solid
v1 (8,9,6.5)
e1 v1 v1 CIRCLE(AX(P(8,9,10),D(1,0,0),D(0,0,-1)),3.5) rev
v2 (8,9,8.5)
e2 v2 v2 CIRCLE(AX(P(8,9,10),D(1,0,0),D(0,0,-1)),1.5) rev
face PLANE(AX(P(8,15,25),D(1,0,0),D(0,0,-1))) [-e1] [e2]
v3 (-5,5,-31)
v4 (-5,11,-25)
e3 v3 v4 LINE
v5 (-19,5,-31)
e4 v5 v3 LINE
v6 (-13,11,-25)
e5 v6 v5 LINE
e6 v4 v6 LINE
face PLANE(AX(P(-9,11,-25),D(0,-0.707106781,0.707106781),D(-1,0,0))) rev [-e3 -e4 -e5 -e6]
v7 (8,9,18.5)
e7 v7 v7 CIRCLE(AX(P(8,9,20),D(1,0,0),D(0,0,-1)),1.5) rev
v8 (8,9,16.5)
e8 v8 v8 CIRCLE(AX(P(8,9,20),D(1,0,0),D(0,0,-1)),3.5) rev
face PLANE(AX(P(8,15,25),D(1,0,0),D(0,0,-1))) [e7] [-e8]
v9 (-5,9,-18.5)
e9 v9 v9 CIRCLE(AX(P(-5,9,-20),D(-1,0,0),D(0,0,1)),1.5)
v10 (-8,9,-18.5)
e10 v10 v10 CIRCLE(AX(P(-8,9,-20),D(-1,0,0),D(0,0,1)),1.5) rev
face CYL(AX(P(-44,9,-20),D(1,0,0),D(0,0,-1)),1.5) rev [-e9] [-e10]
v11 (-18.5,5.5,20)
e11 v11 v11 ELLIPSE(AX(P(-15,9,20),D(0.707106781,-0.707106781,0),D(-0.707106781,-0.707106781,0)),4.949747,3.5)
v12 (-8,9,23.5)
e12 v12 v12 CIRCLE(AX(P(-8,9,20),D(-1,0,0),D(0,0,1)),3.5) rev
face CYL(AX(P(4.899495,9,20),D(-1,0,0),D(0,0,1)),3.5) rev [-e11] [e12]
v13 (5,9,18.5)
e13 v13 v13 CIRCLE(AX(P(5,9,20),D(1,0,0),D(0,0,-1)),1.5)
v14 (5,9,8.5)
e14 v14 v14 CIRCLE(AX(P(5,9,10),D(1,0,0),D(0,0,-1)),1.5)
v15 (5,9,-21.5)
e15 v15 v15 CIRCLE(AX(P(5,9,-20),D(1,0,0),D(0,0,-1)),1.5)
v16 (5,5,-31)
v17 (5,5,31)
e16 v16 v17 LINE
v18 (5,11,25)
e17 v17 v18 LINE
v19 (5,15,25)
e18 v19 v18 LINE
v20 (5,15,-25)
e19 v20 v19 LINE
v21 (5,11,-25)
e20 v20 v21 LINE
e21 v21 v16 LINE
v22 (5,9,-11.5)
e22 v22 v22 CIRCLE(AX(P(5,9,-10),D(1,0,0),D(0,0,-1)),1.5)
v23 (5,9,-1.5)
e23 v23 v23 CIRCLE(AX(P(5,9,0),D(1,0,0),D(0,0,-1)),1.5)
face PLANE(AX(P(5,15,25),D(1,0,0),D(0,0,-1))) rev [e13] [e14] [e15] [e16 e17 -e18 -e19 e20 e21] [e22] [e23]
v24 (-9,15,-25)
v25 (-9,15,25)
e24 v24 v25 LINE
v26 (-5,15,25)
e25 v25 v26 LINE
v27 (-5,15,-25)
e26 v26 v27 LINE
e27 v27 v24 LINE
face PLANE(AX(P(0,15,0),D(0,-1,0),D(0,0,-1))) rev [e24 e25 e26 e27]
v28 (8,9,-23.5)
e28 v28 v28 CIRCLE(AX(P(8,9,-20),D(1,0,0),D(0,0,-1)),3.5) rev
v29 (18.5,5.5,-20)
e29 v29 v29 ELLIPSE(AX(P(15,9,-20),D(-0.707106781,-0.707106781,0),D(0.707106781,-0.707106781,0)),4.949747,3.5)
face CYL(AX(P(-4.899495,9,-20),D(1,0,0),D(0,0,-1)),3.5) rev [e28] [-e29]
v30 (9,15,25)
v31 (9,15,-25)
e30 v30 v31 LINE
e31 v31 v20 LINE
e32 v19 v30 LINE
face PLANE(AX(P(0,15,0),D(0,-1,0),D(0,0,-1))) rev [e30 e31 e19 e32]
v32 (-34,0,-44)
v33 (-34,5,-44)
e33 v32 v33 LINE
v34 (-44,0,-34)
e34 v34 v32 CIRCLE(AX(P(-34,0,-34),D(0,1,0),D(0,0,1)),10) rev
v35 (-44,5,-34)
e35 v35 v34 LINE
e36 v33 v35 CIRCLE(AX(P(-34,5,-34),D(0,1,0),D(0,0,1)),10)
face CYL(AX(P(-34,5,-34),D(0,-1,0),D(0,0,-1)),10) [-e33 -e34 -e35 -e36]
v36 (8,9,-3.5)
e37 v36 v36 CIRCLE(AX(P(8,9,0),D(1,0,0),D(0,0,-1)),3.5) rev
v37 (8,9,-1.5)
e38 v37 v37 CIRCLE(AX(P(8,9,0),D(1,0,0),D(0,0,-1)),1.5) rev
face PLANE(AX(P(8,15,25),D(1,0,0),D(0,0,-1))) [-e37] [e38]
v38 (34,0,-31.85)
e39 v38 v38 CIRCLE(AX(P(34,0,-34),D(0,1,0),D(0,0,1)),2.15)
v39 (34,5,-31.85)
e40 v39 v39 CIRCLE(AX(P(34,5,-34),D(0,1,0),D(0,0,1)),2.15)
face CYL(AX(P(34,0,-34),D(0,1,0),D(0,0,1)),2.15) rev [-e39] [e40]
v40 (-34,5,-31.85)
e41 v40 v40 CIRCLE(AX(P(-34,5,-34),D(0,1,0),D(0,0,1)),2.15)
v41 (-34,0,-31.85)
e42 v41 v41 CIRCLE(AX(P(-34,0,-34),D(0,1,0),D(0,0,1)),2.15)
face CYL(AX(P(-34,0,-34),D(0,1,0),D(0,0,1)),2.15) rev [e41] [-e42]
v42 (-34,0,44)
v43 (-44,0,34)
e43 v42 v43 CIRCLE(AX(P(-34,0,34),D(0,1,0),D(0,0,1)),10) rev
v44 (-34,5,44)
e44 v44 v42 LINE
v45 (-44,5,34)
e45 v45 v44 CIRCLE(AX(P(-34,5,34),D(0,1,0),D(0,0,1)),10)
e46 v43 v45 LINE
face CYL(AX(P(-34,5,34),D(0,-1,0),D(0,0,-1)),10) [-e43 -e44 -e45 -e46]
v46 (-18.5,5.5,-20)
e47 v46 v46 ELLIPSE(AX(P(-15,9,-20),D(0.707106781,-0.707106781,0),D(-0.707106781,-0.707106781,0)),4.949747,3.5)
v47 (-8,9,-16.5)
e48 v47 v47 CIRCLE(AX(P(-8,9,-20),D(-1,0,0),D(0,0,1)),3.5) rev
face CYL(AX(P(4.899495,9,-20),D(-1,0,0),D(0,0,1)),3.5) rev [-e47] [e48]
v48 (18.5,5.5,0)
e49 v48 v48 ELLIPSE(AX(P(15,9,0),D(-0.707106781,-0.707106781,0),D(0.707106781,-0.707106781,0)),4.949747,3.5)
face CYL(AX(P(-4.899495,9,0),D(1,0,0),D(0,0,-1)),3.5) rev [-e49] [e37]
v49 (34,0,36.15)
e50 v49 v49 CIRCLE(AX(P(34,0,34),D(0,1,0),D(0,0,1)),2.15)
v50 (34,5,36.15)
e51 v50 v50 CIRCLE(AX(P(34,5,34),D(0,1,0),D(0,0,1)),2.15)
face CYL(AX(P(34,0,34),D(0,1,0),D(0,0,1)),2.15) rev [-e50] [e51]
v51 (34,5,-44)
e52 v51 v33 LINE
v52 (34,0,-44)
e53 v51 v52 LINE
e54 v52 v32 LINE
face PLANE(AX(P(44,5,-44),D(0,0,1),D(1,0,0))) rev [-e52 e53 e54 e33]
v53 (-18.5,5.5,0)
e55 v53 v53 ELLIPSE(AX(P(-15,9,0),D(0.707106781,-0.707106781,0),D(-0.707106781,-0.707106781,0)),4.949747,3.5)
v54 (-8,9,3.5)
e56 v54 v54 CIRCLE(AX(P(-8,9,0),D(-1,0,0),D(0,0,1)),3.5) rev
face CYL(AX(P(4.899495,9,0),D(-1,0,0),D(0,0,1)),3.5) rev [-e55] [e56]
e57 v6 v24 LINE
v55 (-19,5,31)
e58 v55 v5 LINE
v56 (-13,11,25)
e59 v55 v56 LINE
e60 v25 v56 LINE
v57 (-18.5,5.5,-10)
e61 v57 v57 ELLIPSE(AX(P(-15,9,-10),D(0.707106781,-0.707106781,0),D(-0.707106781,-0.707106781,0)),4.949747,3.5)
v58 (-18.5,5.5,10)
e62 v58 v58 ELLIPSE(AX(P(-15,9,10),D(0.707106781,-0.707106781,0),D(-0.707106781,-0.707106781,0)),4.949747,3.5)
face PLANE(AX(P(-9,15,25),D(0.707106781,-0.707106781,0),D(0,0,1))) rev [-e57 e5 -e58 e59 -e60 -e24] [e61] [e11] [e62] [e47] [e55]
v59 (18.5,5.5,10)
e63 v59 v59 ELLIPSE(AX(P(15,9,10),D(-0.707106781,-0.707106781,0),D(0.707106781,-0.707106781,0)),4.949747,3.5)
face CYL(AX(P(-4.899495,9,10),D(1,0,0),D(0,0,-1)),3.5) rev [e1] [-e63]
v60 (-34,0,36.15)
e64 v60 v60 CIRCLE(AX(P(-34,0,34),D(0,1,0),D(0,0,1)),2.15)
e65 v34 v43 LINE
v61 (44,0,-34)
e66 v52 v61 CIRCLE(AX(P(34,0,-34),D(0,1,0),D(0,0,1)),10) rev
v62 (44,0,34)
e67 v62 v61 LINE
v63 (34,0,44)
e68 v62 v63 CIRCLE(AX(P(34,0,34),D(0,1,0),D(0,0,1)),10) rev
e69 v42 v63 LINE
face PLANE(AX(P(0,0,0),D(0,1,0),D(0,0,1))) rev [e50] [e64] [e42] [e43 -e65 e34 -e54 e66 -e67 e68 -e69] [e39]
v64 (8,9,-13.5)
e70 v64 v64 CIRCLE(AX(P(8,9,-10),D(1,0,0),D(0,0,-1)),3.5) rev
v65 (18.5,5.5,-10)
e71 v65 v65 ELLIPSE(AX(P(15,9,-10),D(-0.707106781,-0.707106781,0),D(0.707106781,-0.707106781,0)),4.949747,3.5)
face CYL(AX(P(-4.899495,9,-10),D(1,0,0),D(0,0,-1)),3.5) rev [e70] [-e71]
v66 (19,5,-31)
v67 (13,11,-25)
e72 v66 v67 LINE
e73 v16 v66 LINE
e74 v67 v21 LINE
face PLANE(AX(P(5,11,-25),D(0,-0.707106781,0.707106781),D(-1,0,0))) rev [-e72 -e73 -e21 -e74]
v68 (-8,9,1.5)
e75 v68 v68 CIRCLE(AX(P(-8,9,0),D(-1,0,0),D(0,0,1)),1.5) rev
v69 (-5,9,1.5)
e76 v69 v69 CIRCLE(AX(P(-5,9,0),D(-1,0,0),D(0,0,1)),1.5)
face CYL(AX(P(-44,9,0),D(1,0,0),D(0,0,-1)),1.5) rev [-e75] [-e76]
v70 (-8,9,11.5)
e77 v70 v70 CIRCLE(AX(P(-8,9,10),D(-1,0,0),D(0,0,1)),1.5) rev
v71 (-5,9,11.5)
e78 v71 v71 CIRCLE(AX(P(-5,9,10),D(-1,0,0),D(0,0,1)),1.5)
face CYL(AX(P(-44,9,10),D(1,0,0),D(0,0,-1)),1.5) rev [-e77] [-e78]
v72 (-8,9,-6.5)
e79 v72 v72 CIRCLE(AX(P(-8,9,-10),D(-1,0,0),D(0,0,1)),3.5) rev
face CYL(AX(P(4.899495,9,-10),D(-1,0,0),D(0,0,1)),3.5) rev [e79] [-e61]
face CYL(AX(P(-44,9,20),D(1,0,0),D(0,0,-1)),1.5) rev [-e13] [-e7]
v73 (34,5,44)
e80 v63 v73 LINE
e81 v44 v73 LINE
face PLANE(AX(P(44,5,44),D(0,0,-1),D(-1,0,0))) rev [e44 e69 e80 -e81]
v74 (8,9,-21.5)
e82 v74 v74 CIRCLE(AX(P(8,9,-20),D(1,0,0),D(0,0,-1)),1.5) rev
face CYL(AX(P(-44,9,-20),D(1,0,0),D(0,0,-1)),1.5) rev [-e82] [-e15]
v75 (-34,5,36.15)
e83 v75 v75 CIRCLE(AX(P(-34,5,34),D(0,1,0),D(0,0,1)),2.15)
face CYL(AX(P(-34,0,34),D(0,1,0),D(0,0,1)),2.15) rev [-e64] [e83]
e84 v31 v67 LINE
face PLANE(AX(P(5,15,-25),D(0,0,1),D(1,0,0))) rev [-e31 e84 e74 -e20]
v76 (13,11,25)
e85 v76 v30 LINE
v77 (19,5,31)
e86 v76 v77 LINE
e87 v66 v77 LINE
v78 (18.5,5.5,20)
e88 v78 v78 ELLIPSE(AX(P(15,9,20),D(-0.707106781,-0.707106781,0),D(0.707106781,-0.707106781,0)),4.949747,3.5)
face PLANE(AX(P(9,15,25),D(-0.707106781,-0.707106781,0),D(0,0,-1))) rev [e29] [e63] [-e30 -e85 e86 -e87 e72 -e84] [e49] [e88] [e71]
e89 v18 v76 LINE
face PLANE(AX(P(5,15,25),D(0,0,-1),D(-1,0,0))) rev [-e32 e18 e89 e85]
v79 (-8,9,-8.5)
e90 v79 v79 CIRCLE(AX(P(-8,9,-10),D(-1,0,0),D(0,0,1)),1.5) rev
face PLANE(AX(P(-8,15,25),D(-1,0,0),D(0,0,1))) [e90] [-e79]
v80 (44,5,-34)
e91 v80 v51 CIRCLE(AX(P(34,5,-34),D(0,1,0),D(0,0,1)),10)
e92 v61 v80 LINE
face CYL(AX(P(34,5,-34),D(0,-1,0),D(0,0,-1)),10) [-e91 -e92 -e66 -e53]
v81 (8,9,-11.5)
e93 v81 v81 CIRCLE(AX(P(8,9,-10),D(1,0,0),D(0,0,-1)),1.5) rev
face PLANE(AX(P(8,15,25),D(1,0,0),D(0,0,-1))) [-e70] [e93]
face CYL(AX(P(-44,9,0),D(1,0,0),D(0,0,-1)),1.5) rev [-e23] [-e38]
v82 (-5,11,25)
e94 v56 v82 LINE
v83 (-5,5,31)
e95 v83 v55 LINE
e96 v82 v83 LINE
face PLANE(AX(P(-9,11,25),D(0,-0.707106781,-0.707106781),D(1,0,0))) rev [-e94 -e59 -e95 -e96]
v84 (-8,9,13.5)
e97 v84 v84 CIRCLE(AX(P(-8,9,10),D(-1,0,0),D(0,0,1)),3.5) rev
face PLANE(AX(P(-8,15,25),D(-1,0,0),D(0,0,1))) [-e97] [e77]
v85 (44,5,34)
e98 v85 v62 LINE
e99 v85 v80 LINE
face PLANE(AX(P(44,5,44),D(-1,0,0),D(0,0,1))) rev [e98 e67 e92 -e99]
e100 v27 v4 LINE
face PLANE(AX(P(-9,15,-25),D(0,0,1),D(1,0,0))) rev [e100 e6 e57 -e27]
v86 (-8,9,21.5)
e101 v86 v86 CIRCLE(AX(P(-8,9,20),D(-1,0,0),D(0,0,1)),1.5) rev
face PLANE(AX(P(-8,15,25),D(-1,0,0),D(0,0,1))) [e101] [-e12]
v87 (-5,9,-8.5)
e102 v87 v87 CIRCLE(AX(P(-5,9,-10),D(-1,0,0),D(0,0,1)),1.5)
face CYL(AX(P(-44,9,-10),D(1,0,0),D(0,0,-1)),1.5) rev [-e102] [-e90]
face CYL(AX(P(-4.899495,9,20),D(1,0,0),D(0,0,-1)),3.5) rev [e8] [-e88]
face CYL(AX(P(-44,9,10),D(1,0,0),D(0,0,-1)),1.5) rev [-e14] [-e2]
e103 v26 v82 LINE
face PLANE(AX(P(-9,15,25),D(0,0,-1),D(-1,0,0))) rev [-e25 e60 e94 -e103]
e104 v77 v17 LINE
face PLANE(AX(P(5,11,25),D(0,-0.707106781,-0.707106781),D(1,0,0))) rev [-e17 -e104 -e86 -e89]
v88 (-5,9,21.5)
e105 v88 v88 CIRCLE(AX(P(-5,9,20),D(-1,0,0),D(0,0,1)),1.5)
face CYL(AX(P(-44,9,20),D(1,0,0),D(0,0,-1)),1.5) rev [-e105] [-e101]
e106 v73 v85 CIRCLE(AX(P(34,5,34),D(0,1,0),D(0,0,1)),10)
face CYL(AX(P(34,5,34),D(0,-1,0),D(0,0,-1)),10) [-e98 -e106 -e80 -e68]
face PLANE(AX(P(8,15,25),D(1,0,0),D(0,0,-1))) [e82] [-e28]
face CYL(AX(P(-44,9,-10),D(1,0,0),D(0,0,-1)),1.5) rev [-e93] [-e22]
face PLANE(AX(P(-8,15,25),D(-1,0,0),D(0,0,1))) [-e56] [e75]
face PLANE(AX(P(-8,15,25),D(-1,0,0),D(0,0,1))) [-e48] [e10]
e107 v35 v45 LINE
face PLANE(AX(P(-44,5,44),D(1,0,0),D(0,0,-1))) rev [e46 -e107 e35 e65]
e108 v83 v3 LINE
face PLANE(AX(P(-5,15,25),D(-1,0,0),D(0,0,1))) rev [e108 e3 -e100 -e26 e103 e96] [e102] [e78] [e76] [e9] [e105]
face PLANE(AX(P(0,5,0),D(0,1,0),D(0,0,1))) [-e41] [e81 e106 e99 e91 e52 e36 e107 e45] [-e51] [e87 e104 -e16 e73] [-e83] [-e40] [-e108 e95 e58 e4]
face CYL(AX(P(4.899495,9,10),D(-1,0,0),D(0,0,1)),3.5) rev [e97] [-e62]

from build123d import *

# Parameters (mm, degrees)
SKETCH1_W           = 88
SKETCH1_H           = 88
BOSS_EXTRUDE1_DEPTH = 5
FILLET1_R           = 10
SKETCH2_R           = 2.15
CUT_EXTRUDE1_DEPTH  = 63.42595614
SKETCH3_W           = 4
SKETCH3_H           = 50
BOSS_EXTRUDE2_DEPTH = 10
CHAMFER1_SIZE       = 10
SKETCH4_R           = 1.5
CUT_EXTRUDE2_DEPTH  = 65.007812023
SKETCH5_R           = 3.5
CUT_EXTRUDE3_DEPTH  = 36
CUT_EXTRUDE4_START  = -36
SKETCH6_R           = 3.5
CUT_EXTRUDE4_DEPTH  = 36
LPATTERN2_COUNT     = 5
LPATTERN2_PITCH     = 10
CHAMFER2_SIZE       = 6


with BuildPart() as part:
    # Sketch1 → Boss-Extrude1 (new body)
    with BuildSketch(Plane(origin=(0, 0, 0), x_dir=(1, 0, 0), z_dir=(0, 1, 0))):
        Rectangle(SKETCH1_W, SKETCH1_H)
    extrude(amount=BOSS_EXTRUDE1_DEPTH)

    # Fillet1
    fillet1_edges = [part.edges().sort_by_distance(p)[0] for p in [
        (-44, 2.5, -44),
        (44, 2.5, -44),
        (44, 2.5, 44),
        (-44, 2.5, 44),
    ]]
    fillet(fillet1_edges, radius=FILLET1_R)

    # Sketch2 → Cut-Extrude1 (cut, through all)
    with BuildSketch(Plane(origin=(0, 5, 0), x_dir=(1, 0, 0), z_dir=(0, 1, 0))):
        with Locations(Location((34, 34, 0), (0, 0, 270))):
            Circle(SKETCH2_R)
        with Locations(Location((34, -34, 0), (0, 0, 270))):
            Circle(SKETCH2_R)
        with Locations(Location((-34, -34, 0), (0, 0, 270))):
            Circle(SKETCH2_R)
        with Locations(Location((-34, 34, 0), (0, 0, 270))):
            Circle(SKETCH2_R)
    extrude(amount=-CUT_EXTRUDE1_DEPTH, mode=Mode.SUBTRACT)

    # Sketch3 → Boss-Extrude2 (add)
    with BuildSketch(Plane(origin=(0, 5, 0), x_dir=(1, 0, 0), z_dir=(0, 1, 0))):
        with Locations((-7, 0)):
            Rectangle(SKETCH3_W, SKETCH3_H)
        with Locations((7, 0)):
            Rectangle(SKETCH3_W, SKETCH3_H)
    extrude(amount=BOSS_EXTRUDE2_DEPTH)

    # Chamfer1
    chamfer1_edges = [part.edges().sort_by_distance(p)[0] for p in [
        (9, 5, 0),
        (-9, 5, 0),
    ]]
    chamfer(chamfer1_edges, length=CHAMFER1_SIZE - 0.0001)  # a hair under: the kernel refuses the full size

    # Sketch4 → Cut-Extrude2 (cut, symmetric)
    with BuildSketch(Plane(origin=(0, 0, 0), x_dir=(0, 0, -1), z_dir=(1, 0, 0))):
        with Locations(Location((-20, 9, 0), (0, 0, 90))):
            Circle(SKETCH4_R)
    cut_extrude2 = extrude(amount=CUT_EXTRUDE2_DEPTH, both=True, mode=Mode.SUBTRACT)

    # Sketch5 → Cut-Extrude3 (cut)
    with BuildSketch(Plane(origin=(44, 0, 0), x_dir=(0, 0, -1), z_dir=(1, 0, 0))):
        with Locations((-20, 9)):
            Circle(SKETCH5_R)
    cut_extrude3 = extrude(amount=-CUT_EXTRUDE3_DEPTH, mode=Mode.SUBTRACT)

    # Sketch6 → Cut-Extrude4 (cut)
    with BuildSketch(Plane.ZY.offset(44).offset(CUT_EXTRUDE4_START)):
        with Locations(Location((20, 9, 0), (0, 0, 180))):
            Circle(SKETCH6_R)
    cut_extrude4 = extrude(amount=CUT_EXTRUDE4_DEPTH, mode=Mode.SUBTRACT)

    # LPattern2: Cut-Extrude2, Cut-Extrude3, Cut-Extrude4 ×5
    with Locations(*[(0, 0, -i * LPATTERN2_PITCH) for i in range(1, LPATTERN2_COUNT)]):
        add(cut_extrude2, mode=Mode.SUBTRACT)
        add(cut_extrude3, mode=Mode.SUBTRACT)
        add(cut_extrude4, mode=Mode.SUBTRACT)

    # Chamfer2
    chamfer2_edges = [part.edges().sort_by_distance(p)[0] for p in [
        (-11.99995, 5, -25),
        (-11.99995, 5, 25),
        (11.99995, 5, -25),
        (11.99995, 5, 25),
    ]]
    chamfer(chamfer2_edges, length=CHAMFER2_SIZE)


solid = part.part
